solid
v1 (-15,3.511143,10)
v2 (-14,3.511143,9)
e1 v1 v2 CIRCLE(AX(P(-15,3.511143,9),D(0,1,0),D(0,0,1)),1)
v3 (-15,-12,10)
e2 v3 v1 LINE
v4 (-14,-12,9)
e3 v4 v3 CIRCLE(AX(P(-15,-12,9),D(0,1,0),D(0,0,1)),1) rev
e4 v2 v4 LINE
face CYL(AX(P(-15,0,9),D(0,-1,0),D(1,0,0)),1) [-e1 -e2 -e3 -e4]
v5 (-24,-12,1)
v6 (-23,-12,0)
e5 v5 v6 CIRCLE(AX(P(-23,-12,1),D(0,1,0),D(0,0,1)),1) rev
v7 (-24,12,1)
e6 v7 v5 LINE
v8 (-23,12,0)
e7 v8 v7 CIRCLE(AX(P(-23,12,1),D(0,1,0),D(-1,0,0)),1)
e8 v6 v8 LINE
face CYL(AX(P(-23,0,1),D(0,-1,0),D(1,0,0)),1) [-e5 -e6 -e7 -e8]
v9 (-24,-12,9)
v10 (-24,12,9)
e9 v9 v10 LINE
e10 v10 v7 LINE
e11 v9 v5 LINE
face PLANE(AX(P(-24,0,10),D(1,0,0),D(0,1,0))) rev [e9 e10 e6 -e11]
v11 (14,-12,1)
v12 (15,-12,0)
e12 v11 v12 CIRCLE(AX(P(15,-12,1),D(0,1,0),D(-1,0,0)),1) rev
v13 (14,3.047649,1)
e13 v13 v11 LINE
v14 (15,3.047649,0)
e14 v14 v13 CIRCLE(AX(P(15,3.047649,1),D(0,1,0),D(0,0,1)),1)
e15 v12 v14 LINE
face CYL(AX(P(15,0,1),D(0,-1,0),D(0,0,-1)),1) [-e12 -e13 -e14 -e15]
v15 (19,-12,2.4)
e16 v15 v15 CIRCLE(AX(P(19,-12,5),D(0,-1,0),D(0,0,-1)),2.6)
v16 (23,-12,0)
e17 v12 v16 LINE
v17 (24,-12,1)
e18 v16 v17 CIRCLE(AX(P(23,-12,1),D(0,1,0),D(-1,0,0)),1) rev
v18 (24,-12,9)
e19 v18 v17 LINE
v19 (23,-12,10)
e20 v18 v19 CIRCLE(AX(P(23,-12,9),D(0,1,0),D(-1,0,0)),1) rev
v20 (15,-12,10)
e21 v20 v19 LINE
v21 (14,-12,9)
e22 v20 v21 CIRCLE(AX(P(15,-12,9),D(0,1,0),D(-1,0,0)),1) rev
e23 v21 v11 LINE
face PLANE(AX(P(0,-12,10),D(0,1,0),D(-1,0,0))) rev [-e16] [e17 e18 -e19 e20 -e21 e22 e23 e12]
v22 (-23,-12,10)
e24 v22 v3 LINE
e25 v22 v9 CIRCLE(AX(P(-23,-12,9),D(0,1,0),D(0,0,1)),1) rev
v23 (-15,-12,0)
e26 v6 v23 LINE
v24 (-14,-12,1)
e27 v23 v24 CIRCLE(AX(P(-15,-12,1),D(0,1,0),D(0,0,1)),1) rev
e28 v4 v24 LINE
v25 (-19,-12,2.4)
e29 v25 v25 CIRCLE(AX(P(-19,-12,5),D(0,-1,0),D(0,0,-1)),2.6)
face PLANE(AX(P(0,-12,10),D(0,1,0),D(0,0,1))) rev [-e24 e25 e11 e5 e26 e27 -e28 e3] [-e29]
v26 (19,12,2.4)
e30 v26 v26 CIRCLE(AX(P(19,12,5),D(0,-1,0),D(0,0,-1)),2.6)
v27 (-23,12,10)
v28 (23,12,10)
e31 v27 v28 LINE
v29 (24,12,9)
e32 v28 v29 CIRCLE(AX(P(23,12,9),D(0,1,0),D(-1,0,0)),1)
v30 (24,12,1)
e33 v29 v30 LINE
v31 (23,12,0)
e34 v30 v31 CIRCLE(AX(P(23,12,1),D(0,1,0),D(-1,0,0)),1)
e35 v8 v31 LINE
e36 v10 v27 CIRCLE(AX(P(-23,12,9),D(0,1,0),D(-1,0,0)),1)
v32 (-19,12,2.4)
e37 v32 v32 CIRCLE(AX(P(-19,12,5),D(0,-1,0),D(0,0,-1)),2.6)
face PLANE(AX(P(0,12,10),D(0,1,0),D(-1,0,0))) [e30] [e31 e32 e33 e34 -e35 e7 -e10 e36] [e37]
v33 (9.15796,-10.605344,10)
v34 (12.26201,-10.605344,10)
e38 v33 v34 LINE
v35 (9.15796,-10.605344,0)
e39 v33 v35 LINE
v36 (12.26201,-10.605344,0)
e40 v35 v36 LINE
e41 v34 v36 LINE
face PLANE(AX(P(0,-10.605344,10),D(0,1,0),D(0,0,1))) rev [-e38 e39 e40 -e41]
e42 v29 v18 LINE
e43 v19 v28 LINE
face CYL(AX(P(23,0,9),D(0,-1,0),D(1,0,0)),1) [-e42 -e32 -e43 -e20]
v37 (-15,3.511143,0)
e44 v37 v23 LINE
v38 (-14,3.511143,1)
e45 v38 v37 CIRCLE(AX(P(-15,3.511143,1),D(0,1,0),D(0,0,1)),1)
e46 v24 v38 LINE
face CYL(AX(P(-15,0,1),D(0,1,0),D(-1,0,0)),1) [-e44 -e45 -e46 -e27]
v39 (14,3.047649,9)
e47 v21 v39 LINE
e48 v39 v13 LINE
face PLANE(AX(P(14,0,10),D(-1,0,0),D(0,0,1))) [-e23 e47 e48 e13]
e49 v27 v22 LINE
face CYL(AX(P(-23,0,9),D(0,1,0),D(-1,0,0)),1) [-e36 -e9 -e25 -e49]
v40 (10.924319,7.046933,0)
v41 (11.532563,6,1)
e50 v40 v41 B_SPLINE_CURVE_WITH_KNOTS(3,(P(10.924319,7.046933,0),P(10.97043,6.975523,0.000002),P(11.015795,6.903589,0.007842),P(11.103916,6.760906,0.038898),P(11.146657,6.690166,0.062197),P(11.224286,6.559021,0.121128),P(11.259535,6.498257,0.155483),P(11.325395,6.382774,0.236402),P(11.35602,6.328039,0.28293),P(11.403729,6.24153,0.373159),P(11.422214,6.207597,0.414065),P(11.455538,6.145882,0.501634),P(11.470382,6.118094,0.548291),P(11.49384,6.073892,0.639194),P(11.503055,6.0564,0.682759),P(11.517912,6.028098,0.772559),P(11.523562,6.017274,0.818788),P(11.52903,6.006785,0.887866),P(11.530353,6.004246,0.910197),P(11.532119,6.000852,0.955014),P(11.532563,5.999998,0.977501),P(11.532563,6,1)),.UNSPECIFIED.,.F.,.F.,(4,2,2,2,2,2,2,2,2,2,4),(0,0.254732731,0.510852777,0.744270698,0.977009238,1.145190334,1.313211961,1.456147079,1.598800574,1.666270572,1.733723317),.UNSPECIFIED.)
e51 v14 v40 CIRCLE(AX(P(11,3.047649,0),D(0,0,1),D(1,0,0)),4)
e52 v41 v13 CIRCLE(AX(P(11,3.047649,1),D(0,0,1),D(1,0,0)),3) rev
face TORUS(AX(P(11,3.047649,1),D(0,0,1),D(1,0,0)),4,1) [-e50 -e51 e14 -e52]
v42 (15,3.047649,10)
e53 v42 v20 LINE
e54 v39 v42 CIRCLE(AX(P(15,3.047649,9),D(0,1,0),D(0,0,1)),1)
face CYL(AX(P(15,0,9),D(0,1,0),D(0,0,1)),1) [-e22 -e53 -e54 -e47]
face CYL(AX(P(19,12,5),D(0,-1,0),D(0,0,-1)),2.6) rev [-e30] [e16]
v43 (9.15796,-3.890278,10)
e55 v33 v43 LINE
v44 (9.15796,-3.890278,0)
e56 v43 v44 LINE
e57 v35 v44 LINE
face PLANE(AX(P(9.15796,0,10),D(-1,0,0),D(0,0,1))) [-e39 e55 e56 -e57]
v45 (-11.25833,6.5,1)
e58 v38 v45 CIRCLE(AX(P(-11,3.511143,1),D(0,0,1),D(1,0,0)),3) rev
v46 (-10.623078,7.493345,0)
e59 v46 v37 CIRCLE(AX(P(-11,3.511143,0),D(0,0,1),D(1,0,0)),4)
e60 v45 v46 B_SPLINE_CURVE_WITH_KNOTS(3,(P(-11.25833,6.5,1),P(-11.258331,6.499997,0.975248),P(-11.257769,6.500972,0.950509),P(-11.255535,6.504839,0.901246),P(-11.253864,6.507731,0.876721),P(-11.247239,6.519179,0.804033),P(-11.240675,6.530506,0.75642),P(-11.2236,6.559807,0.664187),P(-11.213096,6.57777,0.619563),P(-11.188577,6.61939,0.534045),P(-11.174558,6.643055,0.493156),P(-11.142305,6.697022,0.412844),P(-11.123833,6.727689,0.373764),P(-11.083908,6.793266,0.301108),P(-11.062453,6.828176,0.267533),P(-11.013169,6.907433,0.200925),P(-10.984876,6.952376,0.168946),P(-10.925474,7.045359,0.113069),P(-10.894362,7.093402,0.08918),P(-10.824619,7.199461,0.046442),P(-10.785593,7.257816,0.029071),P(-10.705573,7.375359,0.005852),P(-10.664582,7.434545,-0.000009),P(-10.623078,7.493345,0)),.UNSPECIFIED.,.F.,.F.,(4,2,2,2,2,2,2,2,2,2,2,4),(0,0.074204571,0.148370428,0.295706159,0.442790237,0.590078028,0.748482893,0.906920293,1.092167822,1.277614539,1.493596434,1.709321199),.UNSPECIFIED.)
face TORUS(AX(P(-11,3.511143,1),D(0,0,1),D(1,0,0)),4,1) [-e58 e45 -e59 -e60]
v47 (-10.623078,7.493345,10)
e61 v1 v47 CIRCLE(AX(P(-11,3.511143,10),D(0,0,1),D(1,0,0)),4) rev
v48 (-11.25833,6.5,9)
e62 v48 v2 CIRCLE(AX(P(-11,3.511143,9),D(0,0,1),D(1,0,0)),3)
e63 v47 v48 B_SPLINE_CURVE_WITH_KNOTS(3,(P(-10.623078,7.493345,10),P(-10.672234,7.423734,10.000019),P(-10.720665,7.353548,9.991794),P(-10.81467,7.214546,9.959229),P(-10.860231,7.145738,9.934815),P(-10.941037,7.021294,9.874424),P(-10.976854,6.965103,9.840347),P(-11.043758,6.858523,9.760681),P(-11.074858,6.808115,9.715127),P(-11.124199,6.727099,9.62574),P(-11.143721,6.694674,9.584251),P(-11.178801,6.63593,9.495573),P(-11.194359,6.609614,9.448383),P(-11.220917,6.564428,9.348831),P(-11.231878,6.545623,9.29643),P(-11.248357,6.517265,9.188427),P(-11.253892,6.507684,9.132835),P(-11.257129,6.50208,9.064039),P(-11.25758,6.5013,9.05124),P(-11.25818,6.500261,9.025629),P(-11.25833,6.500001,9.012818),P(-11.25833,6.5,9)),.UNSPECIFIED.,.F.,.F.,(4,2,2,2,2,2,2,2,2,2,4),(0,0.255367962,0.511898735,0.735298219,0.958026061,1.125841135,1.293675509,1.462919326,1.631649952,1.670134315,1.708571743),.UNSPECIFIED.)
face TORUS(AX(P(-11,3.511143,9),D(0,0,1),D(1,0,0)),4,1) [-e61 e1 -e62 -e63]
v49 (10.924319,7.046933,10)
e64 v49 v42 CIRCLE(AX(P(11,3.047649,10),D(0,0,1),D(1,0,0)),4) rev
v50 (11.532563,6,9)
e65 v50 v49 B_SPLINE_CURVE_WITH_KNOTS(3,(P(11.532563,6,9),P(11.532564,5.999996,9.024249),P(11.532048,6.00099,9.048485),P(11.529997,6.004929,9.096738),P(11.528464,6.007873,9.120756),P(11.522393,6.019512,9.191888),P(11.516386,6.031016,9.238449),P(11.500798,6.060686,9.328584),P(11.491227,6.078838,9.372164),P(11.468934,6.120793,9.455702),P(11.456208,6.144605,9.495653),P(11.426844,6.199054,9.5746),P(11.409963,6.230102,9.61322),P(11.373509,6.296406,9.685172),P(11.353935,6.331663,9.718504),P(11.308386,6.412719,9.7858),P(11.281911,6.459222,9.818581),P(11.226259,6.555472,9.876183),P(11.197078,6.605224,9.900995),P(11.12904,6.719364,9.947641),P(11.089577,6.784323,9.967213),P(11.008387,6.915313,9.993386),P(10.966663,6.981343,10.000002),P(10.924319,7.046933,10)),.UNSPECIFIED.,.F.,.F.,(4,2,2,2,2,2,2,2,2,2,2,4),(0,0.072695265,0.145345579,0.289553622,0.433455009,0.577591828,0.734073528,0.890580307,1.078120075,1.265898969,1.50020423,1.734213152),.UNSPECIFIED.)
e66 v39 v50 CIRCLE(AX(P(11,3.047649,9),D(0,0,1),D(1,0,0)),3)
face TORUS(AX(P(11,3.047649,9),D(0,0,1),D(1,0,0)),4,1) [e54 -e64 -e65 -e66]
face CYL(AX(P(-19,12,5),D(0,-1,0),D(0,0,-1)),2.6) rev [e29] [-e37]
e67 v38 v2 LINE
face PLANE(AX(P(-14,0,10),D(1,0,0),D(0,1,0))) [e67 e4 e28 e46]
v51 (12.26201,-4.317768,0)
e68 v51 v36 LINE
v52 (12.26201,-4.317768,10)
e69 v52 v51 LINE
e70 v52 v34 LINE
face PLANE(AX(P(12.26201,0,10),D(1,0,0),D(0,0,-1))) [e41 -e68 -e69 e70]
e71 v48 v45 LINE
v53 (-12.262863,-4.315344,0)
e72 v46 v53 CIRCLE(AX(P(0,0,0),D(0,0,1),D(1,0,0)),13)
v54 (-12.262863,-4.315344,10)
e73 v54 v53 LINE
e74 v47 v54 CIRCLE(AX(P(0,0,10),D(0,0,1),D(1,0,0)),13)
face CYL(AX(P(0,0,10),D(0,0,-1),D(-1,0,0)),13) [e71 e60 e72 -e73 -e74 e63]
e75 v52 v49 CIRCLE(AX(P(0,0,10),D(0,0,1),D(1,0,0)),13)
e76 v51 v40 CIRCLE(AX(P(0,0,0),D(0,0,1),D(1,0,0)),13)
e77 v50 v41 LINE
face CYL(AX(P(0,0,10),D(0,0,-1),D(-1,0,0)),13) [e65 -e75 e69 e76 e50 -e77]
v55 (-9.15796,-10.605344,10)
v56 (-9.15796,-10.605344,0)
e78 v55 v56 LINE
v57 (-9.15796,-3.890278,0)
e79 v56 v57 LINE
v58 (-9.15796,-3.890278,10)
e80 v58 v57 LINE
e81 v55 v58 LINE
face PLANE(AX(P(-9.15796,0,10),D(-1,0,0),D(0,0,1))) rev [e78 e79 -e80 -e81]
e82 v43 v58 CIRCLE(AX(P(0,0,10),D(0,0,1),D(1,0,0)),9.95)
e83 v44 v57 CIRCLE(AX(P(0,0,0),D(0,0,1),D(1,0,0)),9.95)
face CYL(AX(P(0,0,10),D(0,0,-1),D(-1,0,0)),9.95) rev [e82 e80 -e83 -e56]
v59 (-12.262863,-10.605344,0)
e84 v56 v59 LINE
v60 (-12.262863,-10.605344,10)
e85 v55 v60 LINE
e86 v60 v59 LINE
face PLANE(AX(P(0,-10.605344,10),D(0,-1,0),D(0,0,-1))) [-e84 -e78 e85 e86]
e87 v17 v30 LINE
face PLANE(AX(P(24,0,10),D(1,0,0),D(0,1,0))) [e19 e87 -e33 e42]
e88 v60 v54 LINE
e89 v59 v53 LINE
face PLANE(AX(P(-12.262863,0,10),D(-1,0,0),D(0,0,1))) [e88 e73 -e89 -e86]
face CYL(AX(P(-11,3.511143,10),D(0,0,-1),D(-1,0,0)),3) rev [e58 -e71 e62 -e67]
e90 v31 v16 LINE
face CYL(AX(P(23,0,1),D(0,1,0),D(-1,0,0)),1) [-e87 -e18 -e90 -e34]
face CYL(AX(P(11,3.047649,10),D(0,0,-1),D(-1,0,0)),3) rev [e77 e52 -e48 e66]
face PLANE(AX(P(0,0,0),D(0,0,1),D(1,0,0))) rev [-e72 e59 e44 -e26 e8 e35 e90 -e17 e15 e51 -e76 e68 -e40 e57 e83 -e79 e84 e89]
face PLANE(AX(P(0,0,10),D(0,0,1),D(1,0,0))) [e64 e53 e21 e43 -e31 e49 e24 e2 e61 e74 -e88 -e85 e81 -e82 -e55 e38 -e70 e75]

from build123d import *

# Parameters (mm, degrees)
BOSS_EXTRUDE1_DEPTH = 10
FILLET1_R           = 3
SKETCH2_R           = 2.6
CUT_EXTRUDE1_DEPTH  = 36.383612026
FILLET2_R           = 1


with BuildPart() as part:
    # Sketch1 → Boss-Extrude1 (new body)
    with BuildSketch(Plane.XY):
        with BuildLine():
            Line((-11.258330249, 6.5), (-14, 6.5))
            Line((-14, 6.5), (-14, -12))
            Line((-14, -12), (-24, -12))
            Line((-24, -12), (-24, 12))
            Line((-24, 12), (24, 12))
            Line((24, 12), (24, -12))
            Line((24, -12), (14, -12))
            Line((14, -12), (14, 6))
            Line((14, 6), (11.532562595, 6))
            ThreePointArc((11.532562595, 6), (12.967632791, 0.916787763), (12.262009764, -4.317767543))
            Line((12.262009764, -4.317767543), (12.262009764, -7.605344152))
            Line((12.262009764, -7.605344152), (12.262009764, -10.605344152))
            Line((12.262009764, -10.605344152), (9.157960199, -10.605344152))
            Line((9.157960199, -10.605344152), (9.157960199, -3.890278267))
            ThreePointArc((9.157960199, -3.890278267), (0, 9.95), (-9.157960199, -3.890278267))
            Line((-9.157960199, -3.890278267), (-9.157960199, -10.605344152))
            Line((-9.157960199, -10.605344152), (-12.262862833, -10.605344152))
            Line((-12.262862833, -10.605344152), (-12.262862833, -7.605344152))
            Line((-12.262862833, -7.605344152), (-12.262862833, -4.315344152))
            ThreePointArc((-12.262862833, -4.315344152), (-12.944286318, 1.202269405), (-11.258330249, 6.5))
        make_face()
    extrude(amount=BOSS_EXTRUDE1_DEPTH)

    # Fillet1
    # the kernel refuses this fillet: 3 mm, written as the material it adds along each edge
    with BuildSketch(Plane(origin=(14, 6, 0), x_dir=(-1, 0, 0), z_dir=(0, 0, 1))) as fillet1_piece_1:
        with BuildLine():
            CenterArc((3, 2.952351111), FILLET1_R, 180, 79.774609626)
            Line((0, 2.952351111), (-0.06, 2.952351111))
            Line((-0.06, 2.952351111), (-0.06, 0))
            Line((-0.06, 0), (0, -0.06))
            ThreePointArc((0, -0.06), (1.233718703, -0.06), (2.456786153, -0.059047022))
            Line((2.456786153, -0.059047022), (2.467437405, 0))
        make_face()
    extrude(amount=10)
    with BuildSketch(Plane(origin=(-14, 6.5, 0), x_dir=(1, 0, 0), z_dir=(0, 0, 1))) as fillet1_piece_2:
        with BuildLine():
            CenterArc((3, -2.988856886), FILLET1_R, 94.93986201, 85.06013799)
            Line((0, -2.988856886), (-0.06, -2.988856886))
            Line((-0.06, -2.988856886), (-0.06, 0))
            Line((-0.06, 0), (0, 0.06))
            ThreePointArc((0, 0.06), (1.370834875, 0.06), (2.736503146, 0.059777138))
            Line((2.736503146, 0.059777138), (2.741669751, 0))
        make_face()
    extrude(amount=10)

    # Sketch2 → Cut-Extrude1 (cut, through all)
    with BuildSketch(Plane.XZ.offset(12)):
        with Locations(Location((-19, 5, 0), (0, 0, 270))):
            Circle(SKETCH2_R)
        with Locations(Location((19, 5, 0), (0, 0, 270))):
            Circle(SKETCH2_R)
    extrude(amount=-CUT_EXTRUDE1_DEPTH, mode=Mode.SUBTRACT)

    # Fillet2
    # the kernel refuses this fillet: 1 mm, written as the material it takes off along each edge
    with BuildSketch(Plane(origin=(-24, -14.5, 0), x_dir=(1, 0, 0), z_dir=(0, 1, 0)), Plane(origin=(24, 14.5, 0), x_dir=(-1, 0, 0), z_dir=(0, -1, 0))) as fillet2_piece_1:
        with BuildLine():
            CenterArc((FILLET2_R, -FILLET2_R), FILLET2_R, 90, 90)
            Line((0, -FILLET2_R), (0, 0))
            Line((0, 0), (FILLET2_R, 0))
        make_face()
    extrude(amount=29, mode=Mode.SUBTRACT)
    with BuildSketch(Plane(origin=(14, -14.5, 0), x_dir=(1, 0, 0), z_dir=(0, 1, 0))) as fillet2_piece_2:
        with BuildLine():
            CenterArc((FILLET2_R, -FILLET2_R), FILLET2_R, 90, 90)
            Line((0, -FILLET2_R), (0, 0))
            Line((0, 0), (FILLET2_R, 0))
        make_face()
    extrude(amount=17.547648889, mode=Mode.SUBTRACT)
    with BuildSketch(Plane(origin=(14, -14.5, 10), x_dir=(1, 0, 0), z_dir=(0, 1, 0))) as fillet2_piece_3:
        with BuildLine():
            CenterArc((FILLET2_R, FILLET2_R), FILLET2_R, 180, 90)
            Line((0, FILLET2_R), (0, 0))
            Line((0, 0), (FILLET2_R, 0))
        make_face()
    extrude(amount=17.547648889, mode=Mode.SUBTRACT)
    with BuildSketch(Plane(origin=(-14, 3.511143114, 0), x_dir=(0, 0, 1), z_dir=(0, -1, 0))) as fillet2_piece_4:
        with BuildLine():
            CenterArc((FILLET2_R, FILLET2_R), FILLET2_R, 180, 90)
            Line((0, FILLET2_R), (0, 0))
            Line((0, 0), (FILLET2_R, 0))
        make_face()
    extrude(amount=18.011143114, mode=Mode.SUBTRACT)
    with BuildSketch(Plane(origin=(-14, 3.511143114, 10), x_dir=(0, 0, -1), z_dir=(0, -1, 0))) as fillet2_piece_5:
        with BuildLine():
            CenterArc((FILLET2_R, -FILLET2_R), FILLET2_R, 90, 90)
            Line((0, -FILLET2_R), (0, 0))
            Line((0, 0), (FILLET2_R, 0))
        make_face()
    extrude(amount=18.011143114, mode=Mode.SUBTRACT)
    with BuildSketch(Plane(origin=(11, 3.047648889, 0), x_dir=(1, 0, 0), z_dir=(0, -1, 0))) as fillet2_piece_6_section:
        with BuildLine():
            CenterArc((3 + FILLET2_R, FILLET2_R), FILLET2_R, 180, 90)
            Line((3, FILLET2_R), (3, 0))
            Line((3, 0), (3 + FILLET2_R, 0))
        make_face()
    fillet2_piece_6 = revolve(axis=Axis((11, 3.047648889, 0), (0, 0, 1)), revolution_arc=127.536161061, mode=Mode.PRIVATE)
    fillet2_piece_6 = fillet2_piece_6 - Plane(origin=(0, 0, 0.285399127), x_dir=(0.8871201995900612, 0.46153846153846184, 0), z_dir=(0, 0, -1)) * Cylinder(13, 16, mode=Mode.PRIVATE)
    add(fillet2_piece_6, mode=Mode.SUBTRACT)
    with BuildSketch(Plane(origin=(11, 3.047648889, 10), x_dir=(1, 0, 0), z_dir=(0, -1, 0))) as fillet2_piece_7_section:
        with BuildLine():
            CenterArc((3 + FILLET2_R, -FILLET2_R), FILLET2_R, 90, 90)
            Line((3, -FILLET2_R), (3, 0))
            Line((3, 0), (3 + FILLET2_R, 0))
        make_face()
    fillet2_piece_7 = revolve(axis=Axis((11, 3.047648889, 10), (0, 0, 1)), revolution_arc=127.536161061, mode=Mode.PRIVATE)
    fillet2_piece_7 = fillet2_piece_7 - Plane(origin=(0, 0, 9.714600873), x_dir=(0.8871201995900612, 0.46153846153846184, 0), z_dir=(0, 0, -1)) * Cylinder(13, 16, mode=Mode.PRIVATE)
    add(fillet2_piece_7, mode=Mode.SUBTRACT)
    with BuildSketch(Plane(origin=(-11, 3.511143114, 0), x_dir=(0.6797454248064234, 0.7334481286735518, 0), z_dir=(0.7334481286735518, -0.6797454248064234, 0))) as fillet2_piece_8_section:
        with BuildLine():
            CenterArc((3 + FILLET2_R, FILLET2_R), FILLET2_R, 180, 90)
            Line((3 + FILLET2_R, 0), (3, 0))
            Line((3, 0), (3, FILLET2_R))
        make_face()
    fillet2_piece_8 = revolve(axis=Axis((-11, 3.511143114, 0), (0, 0, 1)), revolution_arc=132.823752842, mode=Mode.PRIVATE)
    fillet2_piece_8 = fillet2_piece_8 - Plane(origin=(0, 0, 0.285251349), x_dir=(-0.9432971409738413, -0.3319495501285957, 0), z_dir=(0, 0, -1)) * Cylinder(13, 17, mode=Mode.PRIVATE)
    add(fillet2_piece_8, mode=Mode.SUBTRACT)
    with BuildSketch(Plane(origin=(-11, 3.511143114, 10), x_dir=(0.6797454248064234, 0.7334481286735518, 0), z_dir=(0.7334481286735518, -0.6797454248064234, 0))) as fillet2_piece_9_section:
        with BuildLine():
            CenterArc((3 + FILLET2_R, -FILLET2_R), FILLET2_R, 90, 90)
            Line((3 + FILLET2_R, 0), (3, 0))
            Line((3, 0), (3, -FILLET2_R))
        make_face()
    fillet2_piece_9 = revolve(axis=Axis((-11, 3.511143114, 10), (0, 0, 1)), revolution_arc=132.823752842, mode=Mode.PRIVATE)
    fillet2_piece_9 = fillet2_piece_9 - Plane(origin=(0, 0, 9.714748651), x_dir=(-0.9432971409738413, -0.3319495501285957, 0), z_dir=(0, 0, -1)) * Cylinder(13, 17, mode=Mode.PRIVATE)
    add(fillet2_piece_9, mode=Mode.SUBTRACT)
    with BuildSketch(Plane(origin=(24, 14.5, 10), x_dir=(-1, 0, 0), z_dir=(0, -1, 0)), Plane(origin=(-24, -14.5, 10), x_dir=(1, 0, 0), z_dir=(0, 1, 0))) as fillet2_piece_10:
        with BuildLine():
            CenterArc((FILLET2_R, FILLET2_R), FILLET2_R, 180, 90)
            Line((0, FILLET2_R), (0, 0))
            Line((0, 0), (FILLET2_R, 0))
        make_face()
    extrude(amount=29, mode=Mode.SUBTRACT)


solid = part.part
